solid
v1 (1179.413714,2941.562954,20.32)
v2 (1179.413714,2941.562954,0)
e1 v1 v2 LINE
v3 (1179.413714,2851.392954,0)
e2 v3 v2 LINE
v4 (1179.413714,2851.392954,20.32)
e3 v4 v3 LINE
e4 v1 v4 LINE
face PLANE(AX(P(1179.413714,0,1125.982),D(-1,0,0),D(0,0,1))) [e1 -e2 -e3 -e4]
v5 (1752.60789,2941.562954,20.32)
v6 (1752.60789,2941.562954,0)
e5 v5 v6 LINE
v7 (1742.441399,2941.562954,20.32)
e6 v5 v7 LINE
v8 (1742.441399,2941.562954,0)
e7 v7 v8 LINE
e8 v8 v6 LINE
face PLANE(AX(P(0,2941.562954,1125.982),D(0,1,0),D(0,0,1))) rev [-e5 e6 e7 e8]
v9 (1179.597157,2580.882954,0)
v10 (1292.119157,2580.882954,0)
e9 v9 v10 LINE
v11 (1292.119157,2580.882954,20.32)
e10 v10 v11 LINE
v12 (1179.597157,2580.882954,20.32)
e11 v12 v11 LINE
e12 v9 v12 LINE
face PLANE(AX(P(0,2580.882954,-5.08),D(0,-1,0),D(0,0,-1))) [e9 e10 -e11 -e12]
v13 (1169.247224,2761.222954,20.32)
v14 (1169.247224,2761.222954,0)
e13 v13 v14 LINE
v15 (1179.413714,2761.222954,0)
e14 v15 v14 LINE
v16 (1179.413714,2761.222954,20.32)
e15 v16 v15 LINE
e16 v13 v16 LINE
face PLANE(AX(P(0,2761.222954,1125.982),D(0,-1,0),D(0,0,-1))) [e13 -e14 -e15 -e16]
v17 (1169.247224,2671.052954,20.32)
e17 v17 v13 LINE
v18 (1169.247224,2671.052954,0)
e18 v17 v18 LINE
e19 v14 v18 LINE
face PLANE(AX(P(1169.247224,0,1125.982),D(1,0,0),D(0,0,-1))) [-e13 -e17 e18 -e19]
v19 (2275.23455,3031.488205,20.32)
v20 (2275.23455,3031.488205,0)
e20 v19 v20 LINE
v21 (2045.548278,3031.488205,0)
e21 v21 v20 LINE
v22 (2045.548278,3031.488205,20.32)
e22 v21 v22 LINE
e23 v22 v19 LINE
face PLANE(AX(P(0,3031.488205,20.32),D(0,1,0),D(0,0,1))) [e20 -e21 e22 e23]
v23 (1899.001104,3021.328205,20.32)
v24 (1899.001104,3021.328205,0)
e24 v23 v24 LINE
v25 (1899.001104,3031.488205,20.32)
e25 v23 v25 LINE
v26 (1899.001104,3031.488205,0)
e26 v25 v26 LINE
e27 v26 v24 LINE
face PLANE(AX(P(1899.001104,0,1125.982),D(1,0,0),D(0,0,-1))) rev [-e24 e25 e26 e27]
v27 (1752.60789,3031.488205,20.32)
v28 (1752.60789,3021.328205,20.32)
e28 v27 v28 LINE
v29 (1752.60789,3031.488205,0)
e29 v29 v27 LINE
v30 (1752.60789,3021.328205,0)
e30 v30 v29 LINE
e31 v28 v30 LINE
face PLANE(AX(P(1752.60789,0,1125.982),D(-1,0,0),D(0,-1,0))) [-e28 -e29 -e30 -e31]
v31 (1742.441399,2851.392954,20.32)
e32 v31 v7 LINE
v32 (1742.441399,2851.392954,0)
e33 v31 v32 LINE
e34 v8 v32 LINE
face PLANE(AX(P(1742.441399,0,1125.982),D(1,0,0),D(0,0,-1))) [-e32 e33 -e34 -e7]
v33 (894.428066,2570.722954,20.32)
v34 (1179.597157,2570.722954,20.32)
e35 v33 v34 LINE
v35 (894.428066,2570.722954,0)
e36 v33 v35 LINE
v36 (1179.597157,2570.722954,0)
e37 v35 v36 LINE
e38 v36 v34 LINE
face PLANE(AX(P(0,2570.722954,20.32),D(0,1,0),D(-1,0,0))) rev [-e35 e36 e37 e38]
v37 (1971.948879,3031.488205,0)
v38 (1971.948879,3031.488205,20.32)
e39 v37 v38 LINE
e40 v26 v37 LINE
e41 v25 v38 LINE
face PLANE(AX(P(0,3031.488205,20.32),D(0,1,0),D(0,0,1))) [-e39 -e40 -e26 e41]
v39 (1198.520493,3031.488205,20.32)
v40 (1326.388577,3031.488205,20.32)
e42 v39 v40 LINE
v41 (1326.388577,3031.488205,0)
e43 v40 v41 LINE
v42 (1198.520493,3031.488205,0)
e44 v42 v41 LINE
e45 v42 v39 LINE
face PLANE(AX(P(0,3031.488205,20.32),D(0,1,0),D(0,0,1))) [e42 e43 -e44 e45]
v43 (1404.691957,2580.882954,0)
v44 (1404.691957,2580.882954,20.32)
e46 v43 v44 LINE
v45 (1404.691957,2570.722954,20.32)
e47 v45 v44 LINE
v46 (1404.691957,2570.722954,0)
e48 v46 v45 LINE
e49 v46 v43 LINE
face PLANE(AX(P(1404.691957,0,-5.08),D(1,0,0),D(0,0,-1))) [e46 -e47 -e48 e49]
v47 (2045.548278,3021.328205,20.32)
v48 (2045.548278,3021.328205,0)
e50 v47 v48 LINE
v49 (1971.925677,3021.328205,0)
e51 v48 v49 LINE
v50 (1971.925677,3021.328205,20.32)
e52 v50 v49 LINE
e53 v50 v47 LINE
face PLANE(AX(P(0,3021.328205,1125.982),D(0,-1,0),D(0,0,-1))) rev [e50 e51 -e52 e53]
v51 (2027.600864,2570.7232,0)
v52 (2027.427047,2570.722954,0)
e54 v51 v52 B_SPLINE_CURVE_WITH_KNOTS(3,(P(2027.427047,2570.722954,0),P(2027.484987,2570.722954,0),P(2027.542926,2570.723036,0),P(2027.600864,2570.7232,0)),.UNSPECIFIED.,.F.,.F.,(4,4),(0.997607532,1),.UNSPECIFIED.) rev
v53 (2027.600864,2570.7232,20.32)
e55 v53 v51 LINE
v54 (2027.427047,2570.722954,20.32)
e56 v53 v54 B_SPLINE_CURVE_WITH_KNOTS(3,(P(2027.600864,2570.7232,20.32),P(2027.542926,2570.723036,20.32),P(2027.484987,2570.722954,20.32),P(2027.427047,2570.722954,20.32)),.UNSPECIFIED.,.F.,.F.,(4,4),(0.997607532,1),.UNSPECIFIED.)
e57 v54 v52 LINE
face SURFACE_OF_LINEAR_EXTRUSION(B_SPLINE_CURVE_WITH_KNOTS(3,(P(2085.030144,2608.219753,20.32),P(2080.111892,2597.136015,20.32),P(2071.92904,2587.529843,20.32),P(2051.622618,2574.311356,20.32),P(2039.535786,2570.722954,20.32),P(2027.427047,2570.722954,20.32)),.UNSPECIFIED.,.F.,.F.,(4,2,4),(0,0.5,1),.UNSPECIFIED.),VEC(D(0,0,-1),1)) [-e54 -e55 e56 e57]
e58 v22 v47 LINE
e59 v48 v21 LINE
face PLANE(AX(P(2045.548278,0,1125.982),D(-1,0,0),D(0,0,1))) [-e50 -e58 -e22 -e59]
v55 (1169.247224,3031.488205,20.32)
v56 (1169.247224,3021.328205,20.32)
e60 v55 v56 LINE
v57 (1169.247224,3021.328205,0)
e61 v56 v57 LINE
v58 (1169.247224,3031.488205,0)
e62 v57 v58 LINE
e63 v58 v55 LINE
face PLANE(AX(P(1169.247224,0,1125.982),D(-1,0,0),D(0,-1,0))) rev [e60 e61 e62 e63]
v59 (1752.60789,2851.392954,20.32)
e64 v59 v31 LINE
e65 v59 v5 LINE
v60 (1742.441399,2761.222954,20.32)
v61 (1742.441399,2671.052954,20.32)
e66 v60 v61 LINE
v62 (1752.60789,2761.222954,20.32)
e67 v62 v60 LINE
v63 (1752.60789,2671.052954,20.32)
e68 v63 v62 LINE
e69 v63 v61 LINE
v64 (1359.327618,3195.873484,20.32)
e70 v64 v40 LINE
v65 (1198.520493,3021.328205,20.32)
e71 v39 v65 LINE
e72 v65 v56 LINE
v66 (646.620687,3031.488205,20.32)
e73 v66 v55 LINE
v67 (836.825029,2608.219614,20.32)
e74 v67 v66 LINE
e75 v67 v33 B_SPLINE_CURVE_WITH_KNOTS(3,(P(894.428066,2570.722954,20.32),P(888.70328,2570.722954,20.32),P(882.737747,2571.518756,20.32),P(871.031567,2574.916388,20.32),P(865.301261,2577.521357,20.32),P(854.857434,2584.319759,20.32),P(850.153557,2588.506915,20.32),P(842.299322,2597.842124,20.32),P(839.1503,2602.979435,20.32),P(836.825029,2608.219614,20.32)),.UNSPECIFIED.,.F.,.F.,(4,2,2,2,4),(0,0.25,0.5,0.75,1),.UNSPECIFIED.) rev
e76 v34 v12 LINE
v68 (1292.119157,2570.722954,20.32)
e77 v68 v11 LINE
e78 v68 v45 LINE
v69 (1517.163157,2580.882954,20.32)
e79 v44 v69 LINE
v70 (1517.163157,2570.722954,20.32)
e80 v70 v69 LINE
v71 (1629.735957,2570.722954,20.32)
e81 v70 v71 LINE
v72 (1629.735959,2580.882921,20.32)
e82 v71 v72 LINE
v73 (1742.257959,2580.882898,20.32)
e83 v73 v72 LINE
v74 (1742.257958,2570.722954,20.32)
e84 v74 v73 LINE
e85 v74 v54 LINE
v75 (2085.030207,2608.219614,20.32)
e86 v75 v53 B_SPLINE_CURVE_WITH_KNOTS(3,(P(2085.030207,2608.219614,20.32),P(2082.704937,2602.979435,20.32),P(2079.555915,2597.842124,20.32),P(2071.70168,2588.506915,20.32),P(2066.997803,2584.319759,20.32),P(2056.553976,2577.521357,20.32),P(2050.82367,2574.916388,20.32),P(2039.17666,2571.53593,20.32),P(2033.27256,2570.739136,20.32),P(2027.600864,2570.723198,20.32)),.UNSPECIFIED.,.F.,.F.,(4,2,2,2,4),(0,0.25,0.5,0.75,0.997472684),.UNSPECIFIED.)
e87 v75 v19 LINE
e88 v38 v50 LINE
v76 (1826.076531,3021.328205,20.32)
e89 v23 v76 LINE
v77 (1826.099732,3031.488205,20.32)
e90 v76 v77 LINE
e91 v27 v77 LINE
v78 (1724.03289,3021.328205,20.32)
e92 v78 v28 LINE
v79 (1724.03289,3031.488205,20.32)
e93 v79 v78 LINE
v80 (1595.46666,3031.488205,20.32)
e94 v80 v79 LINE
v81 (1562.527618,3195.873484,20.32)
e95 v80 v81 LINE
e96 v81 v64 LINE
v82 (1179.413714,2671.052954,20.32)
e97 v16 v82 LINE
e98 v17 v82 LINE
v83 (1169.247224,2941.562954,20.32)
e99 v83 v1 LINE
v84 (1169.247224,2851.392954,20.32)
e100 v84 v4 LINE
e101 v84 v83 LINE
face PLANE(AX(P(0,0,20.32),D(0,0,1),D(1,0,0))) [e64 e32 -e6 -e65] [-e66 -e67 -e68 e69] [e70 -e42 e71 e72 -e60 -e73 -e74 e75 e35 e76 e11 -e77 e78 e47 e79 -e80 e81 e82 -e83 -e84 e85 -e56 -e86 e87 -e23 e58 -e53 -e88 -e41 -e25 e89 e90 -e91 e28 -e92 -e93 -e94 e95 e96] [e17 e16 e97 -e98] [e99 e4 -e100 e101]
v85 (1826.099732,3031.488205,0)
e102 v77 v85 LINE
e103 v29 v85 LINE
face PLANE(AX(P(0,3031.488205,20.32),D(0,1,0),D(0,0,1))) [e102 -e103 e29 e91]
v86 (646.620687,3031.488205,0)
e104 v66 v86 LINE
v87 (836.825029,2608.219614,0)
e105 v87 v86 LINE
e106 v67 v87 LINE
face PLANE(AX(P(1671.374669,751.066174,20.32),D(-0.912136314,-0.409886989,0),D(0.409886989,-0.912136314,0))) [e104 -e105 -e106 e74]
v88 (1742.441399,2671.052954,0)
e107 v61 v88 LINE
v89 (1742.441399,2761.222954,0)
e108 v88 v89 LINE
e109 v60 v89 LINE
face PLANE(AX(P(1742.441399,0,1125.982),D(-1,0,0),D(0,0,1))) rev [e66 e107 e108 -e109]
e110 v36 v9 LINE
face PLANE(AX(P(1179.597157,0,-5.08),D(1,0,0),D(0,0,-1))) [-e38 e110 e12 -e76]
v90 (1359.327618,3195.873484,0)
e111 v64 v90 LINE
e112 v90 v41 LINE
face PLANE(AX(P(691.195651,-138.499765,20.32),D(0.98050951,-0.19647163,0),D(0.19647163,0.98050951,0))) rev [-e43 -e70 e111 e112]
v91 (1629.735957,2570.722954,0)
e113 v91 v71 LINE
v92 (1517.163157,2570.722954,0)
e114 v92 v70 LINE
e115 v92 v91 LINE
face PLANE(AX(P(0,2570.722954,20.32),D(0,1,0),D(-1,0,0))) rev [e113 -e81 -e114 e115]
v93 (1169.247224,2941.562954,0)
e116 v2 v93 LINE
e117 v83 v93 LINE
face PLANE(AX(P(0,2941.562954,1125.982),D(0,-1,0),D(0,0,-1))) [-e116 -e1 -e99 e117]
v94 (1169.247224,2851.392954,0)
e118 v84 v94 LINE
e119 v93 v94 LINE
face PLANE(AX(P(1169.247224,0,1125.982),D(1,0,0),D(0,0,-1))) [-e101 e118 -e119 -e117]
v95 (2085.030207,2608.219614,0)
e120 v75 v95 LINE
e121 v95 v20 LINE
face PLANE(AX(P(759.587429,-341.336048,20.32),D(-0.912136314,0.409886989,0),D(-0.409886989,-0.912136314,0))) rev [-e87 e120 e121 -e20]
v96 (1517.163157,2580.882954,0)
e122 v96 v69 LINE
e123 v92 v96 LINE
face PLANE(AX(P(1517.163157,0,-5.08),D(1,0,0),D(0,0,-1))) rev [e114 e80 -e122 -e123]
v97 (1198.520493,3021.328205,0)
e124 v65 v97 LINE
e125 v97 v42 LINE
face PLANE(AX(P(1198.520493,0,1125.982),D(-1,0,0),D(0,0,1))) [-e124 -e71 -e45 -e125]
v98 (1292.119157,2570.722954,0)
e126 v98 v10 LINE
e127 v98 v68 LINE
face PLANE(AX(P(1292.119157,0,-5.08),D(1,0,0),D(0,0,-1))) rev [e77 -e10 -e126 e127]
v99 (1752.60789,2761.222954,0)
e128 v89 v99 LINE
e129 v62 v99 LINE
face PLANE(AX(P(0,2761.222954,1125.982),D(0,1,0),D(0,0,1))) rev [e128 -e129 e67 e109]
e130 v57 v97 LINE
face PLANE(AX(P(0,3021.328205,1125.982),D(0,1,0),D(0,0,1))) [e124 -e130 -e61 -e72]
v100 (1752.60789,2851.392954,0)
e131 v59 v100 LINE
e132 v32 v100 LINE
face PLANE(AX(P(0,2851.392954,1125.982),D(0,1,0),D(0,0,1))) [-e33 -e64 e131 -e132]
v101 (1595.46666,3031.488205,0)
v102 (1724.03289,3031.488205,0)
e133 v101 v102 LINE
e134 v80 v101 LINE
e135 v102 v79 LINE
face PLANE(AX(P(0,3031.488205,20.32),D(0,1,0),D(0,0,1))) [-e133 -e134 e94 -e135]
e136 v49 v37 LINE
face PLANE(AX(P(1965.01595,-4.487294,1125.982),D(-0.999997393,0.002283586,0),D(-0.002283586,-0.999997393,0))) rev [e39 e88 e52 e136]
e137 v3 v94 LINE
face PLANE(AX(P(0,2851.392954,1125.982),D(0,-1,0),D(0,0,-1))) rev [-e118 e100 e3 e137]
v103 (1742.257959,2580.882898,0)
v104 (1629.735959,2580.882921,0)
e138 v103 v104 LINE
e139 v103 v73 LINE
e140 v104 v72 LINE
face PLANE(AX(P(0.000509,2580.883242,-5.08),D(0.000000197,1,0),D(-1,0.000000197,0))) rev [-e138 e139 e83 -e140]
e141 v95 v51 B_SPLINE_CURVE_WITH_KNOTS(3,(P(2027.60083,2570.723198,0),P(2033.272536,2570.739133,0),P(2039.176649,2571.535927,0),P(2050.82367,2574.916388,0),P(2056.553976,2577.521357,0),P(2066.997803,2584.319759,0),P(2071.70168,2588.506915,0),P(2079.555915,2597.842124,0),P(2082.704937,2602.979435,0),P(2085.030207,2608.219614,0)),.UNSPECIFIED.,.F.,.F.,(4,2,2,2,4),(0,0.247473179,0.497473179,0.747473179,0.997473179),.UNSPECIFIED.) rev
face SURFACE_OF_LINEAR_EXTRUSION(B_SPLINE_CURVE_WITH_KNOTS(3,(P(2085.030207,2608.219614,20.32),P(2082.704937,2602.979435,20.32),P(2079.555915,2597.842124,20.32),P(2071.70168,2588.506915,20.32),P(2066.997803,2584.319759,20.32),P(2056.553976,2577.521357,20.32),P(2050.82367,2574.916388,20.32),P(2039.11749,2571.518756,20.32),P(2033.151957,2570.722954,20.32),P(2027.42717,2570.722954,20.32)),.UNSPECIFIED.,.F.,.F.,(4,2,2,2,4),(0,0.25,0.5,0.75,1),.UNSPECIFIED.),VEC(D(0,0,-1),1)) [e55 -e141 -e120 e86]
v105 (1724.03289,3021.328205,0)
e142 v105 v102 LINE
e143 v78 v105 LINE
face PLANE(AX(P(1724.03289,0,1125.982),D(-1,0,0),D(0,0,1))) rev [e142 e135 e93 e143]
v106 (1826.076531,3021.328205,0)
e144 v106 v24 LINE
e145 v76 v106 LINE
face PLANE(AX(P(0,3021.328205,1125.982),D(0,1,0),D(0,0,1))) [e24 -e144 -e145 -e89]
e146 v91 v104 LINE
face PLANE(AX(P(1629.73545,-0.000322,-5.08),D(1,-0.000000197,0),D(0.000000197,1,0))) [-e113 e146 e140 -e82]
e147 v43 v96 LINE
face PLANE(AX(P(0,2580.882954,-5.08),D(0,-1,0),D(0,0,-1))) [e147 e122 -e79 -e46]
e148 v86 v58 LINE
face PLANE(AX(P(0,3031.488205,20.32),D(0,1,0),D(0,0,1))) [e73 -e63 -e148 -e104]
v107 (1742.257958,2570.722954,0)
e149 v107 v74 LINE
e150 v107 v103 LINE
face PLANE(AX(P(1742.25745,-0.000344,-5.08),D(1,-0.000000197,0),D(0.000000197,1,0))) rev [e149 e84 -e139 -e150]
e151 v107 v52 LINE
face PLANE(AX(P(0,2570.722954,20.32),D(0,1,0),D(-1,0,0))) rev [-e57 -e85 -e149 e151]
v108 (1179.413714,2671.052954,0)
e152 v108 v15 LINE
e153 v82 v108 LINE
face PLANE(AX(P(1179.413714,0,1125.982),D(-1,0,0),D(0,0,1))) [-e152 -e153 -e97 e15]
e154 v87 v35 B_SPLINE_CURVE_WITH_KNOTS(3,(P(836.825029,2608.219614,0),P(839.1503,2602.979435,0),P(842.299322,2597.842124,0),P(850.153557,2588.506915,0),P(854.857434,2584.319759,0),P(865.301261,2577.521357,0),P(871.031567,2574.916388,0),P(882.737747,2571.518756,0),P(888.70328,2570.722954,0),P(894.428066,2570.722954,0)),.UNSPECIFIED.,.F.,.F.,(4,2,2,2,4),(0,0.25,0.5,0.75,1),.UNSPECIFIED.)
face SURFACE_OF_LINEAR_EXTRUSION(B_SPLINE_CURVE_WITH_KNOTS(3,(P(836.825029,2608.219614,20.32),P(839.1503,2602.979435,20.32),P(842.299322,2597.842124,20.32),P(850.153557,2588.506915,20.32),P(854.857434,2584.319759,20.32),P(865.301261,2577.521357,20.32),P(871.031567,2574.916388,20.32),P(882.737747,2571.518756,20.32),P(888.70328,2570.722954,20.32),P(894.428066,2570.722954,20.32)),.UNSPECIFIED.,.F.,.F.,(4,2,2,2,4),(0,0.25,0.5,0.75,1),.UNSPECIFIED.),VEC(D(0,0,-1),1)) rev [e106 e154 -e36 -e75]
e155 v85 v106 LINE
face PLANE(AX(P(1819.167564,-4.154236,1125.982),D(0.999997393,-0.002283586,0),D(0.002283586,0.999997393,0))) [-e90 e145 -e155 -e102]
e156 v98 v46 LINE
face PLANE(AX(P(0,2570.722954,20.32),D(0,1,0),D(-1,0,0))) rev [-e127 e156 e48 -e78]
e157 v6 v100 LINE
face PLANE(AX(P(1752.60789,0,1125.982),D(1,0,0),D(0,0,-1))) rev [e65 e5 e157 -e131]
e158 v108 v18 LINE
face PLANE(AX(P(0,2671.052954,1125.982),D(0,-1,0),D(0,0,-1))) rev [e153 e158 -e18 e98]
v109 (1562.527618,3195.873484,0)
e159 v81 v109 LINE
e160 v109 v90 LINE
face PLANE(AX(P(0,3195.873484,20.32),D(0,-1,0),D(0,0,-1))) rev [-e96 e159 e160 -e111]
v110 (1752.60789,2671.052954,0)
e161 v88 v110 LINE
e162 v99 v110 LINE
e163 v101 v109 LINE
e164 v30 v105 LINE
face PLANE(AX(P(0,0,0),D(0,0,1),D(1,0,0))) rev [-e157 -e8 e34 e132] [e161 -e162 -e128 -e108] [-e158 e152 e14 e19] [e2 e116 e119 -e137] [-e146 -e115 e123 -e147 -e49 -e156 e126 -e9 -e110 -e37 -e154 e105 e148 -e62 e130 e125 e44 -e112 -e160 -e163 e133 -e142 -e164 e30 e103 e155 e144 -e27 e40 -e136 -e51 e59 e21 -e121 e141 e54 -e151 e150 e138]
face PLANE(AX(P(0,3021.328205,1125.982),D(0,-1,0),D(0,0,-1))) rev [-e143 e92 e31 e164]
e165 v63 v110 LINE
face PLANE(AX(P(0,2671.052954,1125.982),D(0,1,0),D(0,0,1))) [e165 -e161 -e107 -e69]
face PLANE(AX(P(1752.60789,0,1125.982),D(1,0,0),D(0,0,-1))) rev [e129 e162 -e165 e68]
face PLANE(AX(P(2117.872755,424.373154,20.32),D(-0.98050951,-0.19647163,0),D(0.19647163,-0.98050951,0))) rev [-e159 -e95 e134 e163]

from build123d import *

# Parameters (mm, degrees)
BOSS_EXTRUDE1_DEPTH      = 20.32
CUT_EXTRUDE1_START       = -20.32
CUT_EXTRUDE1_OUTLINE_W   = 112.522
CUT_EXTRUDE1_OUTLINE_H   = 10.16
CUT_EXTRUDE1_OUTLINE_W_2 = 112.4712
CUT_EXTRUDE1_DEPTH       = 20.32
SKETCH3_W                = 10.166490401
SKETCH3_H                = 90.17
SKETCH3_W_2              = 29.273269095
SKETCH3_H_2              = 10.16
SKETCH3_W_3              = 28.575
CUT_EXTRUDE2_DEPTH       = 1125.982


# Read off the part's stored shape, not the designer's step: Cut-Extrude1
with BuildPart() as part:
    # Sketch1 → Boss-Extrude1 (new body)
    with BuildSketch(Plane.XY):
        Polygon((1595.466660195, 3031.488204655), (1326.388576611, 3031.488204655), (1359.327618403, 3195.873483514), (1562.527618403, 3195.873483514), align=None)
        with BuildLine():
            Line((894.428066471, 2570.722953846), (2027.427046989, 2570.722953846))
            add(Edge.make_bspline(
                [(2085.030207364, 2608.219614395), (2082.704936523, 2602.979434666), (2079.555914944, 2597.842123597), (2071.701679737, 2588.506915395), (2066.997802899, 2584.31975945), (2056.553975566, 2577.521356648), (2050.823670006, 2574.916388157), (2039.117489861, 2571.518756347), (2033.151956819, 2570.722953846), (2027.427046989, 2570.722953846)],
                knots=[0, 0, 0, 0, 0.25, 0.25, 0.5, 0.5, 0.75, 0.75, 1, 1, 1, 1], degree=3))
            Line((2085.030207364, 2608.219614395), (2275.234550162, 3031.488204655))
            Line((2275.234550162, 3031.488204655), (646.620686644, 3031.488204655))
            Line((646.620686644, 3031.488204655), (836.825029442, 2608.219614395))
            add(Edge.make_bspline(
                [(836.825029442, 2608.219614395), (839.150300283, 2602.979434666), (842.299321863, 2597.842123597), (850.153557069, 2588.506915395), (854.857433907, 2584.31975945), (865.30126124, 2577.521356648), (871.0315668, 2574.916388157), (882.737746945, 2571.518756347), (888.703279987, 2570.722953846), (894.428066471, 2570.722953846)],
                knots=[0, 0, 0, 0, 0.25, 0.25, 0.5, 0.5, 0.75, 0.75, 1, 1, 1, 1], degree=3))
        make_face()
    extrude(amount=BOSS_EXTRUDE1_DEPTH)

    # Cut-Extrude1 outline → Cut-Extrude1 (cut)
    with BuildSketch(Plane.XY.offset(20.32).offset(CUT_EXTRUDE1_START)):
        Polygon((1629.735958734, 2580.882920539), (1629.73595673, 2570.722953846), (1742.25795673, 2570.722953846), (1742.257958734, 2580.882898338), align=None)
        with Locations((1235.85815673, 2575.802953846)):
            Rectangle(CUT_EXTRUDE1_OUTLINE_W, CUT_EXTRUDE1_OUTLINE_H)
        with Locations((1460.92755673, 2575.802953846)):
            Rectangle(CUT_EXTRUDE1_OUTLINE_W_2, CUT_EXTRUDE1_OUTLINE_H)
    extrude(amount=CUT_EXTRUDE1_DEPTH, mode=Mode.SUBTRACT)

    # Sketch3 → Cut-Extrude2 (cut)
    with BuildSketch(Plane(origin=(0, 0, 0), x_dir=(-1, 0, 0), z_dir=(0, 0, -1))):
        with Locations((-1174.33046881, 2716.137953846)):
            Rectangle(SKETCH3_W, SKETCH3_H)
        with Locations((-1174.33046881, 2896.477953846)):
            Rectangle(SKETCH3_W, SKETCH3_H)
        with Locations((-1183.883858158, 3026.408204655)):
            Rectangle(SKETCH3_W_2, SKETCH3_H_2)
        with Locations((-1738.320389849, 3026.408204655)):
            Rectangle(SKETCH3_W_3, SKETCH3_H_2)
        with Locations((-1747.524644649, 2896.477953846)):
            Rectangle(SKETCH3_W, SKETCH3_H)
        with Locations((-1747.524644649, 2716.137953846)):
            Rectangle(SKETCH3_W, SKETCH3_H)
        Polygon((-1826.076531052, 3021.328204655), (-1826.099732345, 3031.488204655), (-1899.001104211, 3031.488204655), (-1899.001104211, 3021.328204655), align=None)
        Polygon((-2045.548278228, 3031.488204655), (-2045.548278228, 3021.328204655), (-1971.92567737, 3021.328204655), (-1971.948878664, 3031.488204655), align=None)
    extrude(amount=-CUT_EXTRUDE2_DEPTH, mode=Mode.SUBTRACT)


solid = part.part
